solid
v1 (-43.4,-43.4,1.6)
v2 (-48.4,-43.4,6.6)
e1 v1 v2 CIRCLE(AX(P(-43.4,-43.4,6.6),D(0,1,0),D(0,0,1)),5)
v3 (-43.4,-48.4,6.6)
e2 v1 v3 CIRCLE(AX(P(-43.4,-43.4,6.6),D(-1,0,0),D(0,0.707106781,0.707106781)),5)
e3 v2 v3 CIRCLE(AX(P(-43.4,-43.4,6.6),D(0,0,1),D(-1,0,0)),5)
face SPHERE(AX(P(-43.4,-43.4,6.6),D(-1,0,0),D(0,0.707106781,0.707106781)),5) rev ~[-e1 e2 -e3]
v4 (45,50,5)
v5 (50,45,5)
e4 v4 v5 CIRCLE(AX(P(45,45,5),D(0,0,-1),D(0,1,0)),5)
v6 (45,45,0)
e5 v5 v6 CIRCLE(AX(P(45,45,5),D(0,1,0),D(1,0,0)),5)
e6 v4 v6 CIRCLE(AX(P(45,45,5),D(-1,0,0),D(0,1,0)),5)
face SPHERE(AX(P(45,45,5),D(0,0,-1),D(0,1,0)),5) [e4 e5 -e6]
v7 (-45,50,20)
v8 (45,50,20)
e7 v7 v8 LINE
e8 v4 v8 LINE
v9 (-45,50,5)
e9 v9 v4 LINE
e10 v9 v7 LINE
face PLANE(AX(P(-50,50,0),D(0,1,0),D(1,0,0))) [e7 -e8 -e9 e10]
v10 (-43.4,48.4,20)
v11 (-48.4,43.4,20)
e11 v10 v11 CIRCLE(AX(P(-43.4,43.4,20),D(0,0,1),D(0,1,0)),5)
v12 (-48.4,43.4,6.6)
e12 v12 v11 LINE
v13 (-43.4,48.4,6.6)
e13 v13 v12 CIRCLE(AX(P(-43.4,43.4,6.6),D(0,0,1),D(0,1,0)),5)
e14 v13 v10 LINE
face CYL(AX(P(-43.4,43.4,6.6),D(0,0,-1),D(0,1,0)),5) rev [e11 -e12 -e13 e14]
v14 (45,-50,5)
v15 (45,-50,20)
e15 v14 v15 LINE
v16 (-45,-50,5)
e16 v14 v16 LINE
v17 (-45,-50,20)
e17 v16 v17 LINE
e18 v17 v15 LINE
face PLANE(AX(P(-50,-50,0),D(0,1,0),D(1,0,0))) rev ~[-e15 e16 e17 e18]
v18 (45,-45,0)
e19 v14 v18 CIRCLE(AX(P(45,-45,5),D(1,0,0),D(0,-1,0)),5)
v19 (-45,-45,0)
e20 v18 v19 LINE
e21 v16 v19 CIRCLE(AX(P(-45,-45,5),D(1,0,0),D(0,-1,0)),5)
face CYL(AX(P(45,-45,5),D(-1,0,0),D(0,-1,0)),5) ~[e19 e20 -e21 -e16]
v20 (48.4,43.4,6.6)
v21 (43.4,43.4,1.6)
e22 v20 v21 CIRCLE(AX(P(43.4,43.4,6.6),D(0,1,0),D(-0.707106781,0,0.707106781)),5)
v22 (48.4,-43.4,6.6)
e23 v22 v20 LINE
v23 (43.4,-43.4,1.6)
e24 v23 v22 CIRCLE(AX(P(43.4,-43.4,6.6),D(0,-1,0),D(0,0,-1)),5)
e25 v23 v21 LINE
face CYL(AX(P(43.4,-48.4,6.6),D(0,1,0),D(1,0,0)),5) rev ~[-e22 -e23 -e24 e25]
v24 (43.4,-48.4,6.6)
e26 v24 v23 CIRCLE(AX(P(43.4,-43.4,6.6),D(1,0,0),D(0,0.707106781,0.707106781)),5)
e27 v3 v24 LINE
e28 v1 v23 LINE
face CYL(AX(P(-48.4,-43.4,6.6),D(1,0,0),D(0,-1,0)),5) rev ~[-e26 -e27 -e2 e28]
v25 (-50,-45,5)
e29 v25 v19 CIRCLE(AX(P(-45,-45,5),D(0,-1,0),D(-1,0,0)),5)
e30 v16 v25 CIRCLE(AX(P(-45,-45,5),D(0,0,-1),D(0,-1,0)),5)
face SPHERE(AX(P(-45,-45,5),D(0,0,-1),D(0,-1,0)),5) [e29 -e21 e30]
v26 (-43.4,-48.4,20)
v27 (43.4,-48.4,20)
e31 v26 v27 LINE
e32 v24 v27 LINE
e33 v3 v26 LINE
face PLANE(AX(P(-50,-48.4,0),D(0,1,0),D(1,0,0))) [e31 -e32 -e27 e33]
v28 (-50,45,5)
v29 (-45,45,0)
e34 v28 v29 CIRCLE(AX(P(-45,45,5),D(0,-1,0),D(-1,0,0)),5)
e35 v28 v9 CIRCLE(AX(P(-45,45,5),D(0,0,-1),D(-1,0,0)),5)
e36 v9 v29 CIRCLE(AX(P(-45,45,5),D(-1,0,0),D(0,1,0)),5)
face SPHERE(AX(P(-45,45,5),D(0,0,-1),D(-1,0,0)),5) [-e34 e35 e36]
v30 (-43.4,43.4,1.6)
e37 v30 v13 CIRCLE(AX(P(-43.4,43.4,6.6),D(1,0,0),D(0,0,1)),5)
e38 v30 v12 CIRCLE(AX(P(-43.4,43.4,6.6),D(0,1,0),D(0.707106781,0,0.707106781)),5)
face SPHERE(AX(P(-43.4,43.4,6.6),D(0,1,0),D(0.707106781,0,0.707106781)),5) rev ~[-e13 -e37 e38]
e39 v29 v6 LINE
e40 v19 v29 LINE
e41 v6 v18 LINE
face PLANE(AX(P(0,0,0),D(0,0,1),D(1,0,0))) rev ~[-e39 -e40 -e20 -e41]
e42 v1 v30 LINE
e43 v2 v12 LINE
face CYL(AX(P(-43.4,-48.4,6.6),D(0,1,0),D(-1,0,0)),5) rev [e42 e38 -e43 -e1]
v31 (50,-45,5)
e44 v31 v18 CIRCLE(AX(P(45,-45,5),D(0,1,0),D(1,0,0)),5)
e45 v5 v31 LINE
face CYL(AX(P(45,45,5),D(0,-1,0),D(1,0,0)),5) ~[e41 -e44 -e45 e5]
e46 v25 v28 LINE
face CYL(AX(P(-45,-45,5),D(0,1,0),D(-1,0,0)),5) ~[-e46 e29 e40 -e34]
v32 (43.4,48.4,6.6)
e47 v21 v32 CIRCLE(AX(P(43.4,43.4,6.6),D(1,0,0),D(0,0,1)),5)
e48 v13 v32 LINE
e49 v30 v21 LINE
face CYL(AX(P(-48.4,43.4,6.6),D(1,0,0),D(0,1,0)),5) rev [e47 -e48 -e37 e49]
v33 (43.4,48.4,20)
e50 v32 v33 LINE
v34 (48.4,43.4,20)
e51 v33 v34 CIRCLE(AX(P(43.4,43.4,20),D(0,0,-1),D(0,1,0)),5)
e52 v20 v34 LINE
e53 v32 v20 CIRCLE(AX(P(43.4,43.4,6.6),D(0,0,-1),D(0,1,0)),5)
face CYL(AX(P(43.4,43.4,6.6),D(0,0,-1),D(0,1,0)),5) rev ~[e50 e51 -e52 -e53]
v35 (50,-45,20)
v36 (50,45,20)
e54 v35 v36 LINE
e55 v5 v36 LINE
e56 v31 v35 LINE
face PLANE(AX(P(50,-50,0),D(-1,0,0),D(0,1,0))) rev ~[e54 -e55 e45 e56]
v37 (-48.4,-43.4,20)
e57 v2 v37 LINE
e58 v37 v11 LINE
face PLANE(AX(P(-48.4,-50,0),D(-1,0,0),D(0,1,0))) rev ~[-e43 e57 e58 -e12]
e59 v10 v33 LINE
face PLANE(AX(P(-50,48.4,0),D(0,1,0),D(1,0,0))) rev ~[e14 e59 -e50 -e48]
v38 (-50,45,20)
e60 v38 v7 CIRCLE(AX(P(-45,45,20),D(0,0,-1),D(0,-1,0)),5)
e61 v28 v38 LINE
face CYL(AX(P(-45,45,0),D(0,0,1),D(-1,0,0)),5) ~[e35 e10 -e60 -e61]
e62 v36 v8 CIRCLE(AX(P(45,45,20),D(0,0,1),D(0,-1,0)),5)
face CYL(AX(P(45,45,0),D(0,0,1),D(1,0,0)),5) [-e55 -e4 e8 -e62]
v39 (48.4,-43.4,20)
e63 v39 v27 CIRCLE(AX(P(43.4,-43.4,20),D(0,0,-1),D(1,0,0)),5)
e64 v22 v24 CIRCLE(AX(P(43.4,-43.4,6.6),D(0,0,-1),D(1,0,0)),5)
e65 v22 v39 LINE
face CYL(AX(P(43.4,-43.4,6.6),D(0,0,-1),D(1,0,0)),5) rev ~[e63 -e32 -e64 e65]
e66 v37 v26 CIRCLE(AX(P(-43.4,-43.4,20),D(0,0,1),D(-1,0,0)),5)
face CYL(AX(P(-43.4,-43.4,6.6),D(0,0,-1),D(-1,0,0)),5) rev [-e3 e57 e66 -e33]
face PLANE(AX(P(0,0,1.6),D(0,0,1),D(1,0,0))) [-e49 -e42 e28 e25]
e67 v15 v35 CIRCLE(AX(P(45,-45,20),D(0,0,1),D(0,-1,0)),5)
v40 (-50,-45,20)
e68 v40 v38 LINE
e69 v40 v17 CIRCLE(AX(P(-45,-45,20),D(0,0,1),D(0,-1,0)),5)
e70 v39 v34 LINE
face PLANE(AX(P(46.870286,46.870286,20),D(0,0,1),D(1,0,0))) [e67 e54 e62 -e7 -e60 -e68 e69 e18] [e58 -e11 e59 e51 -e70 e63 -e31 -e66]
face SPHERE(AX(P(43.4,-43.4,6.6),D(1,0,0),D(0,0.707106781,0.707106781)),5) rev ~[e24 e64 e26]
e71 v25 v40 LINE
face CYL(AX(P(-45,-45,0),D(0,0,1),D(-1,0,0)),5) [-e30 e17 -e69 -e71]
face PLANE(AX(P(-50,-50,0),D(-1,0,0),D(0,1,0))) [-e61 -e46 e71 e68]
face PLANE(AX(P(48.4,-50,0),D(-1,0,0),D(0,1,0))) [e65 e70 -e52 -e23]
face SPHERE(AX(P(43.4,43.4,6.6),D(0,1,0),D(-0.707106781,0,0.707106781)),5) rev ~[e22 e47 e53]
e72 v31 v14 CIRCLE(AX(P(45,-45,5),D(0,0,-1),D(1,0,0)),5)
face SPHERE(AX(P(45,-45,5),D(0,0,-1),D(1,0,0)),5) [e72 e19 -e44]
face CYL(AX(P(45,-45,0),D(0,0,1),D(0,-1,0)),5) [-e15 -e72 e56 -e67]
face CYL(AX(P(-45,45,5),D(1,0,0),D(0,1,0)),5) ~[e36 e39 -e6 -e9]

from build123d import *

# Parameters (mm, degrees)
F0_W         = 100
F0_H         = 100
F1_DEPTH     = 20
F2_T         = -1.6
F3_R         = 5
F4_T1_DEPTH  = 13.4
F4_S5_W      = 5
F4_S5_H      = 5
F4_T6_DEPTH  = 5
F4_S11_W     = 5
F4_S11_H     = 5
F4_T12_DEPTH = 5
F4_S17_W     = 5
F4_S17_H     = 5
F4_T18_DEPTH = 5
F4_S23_W     = 5
F4_S23_H     = 5
F4_T24_DEPTH = 5
F5_R         = 5
F6_R         = 5


# Not quite as in the source:
# - a fillet or chamfer that OpenCascade refuses, or shapes differently, is made with other operations: its cross-section is extruded or revolved along the edge and cut away or added


with BuildPart() as f1:
    # F0 (on Top) → F1 (new body)
    with BuildSketch(Plane.XY):
        Rectangle(F0_W, F0_H)
    extrude(amount=F1_DEPTH)

    # F2
    f2_openings = [f1.faces().sort_by_distance(p)[0] for p in [
        (0, 0, 20),
    ]]
    offset(amount=F2_T, openings=f2_openings)

    # F3
    f3_edges = [f1.edges().sort_by_distance(p)[0] for p in [
        (-48.4, 0, 1.6),
        (0, 48.4, 1.6),
        (48.4, 0, 1.6),
        (0, -48.4, 1.6),
    ]]
    fillet(f3_edges, radius=F3_R)

    # F4: fillet of radius 5 on 8 edges, made by hand

    # F4_s2 → F4_t1 (join)
    with BuildSketch(Plane.XY.offset(6.6)):
        with BuildLine():
            ThreePointArc((43.4, 48.4), (46.9355339059, 46.9355339059), (48.4, 43.4))
            Line((48.4, 43.4), (48.4, 48.4))
            Line((48.4, 48.4), (43.4, 48.4))
        make_face()
        with BuildLine():
            ThreePointArc((48.4, -43.4), (46.9355339059, -46.9355339059), (43.4, -48.4))
            Line((43.4, -48.4), (48.4, -48.4))
            Line((48.4, -48.4), (48.4, -43.4))
        make_face()
        with BuildLine():
            ThreePointArc((-48.4, -43.4), (-46.9355339059, -46.9355339059), (-43.4, -48.4))
            Line((-43.4, -48.4), (-48.4, -48.4))
            Line((-48.4, -48.4), (-48.4, -43.4))
        make_face()
        with BuildLine():
            ThreePointArc((-43.4, 48.4), (-46.9355339059, 46.9355339059), (-48.4, 43.4))
            Line((-48.4, 43.4), (-48.4, 48.4))
            Line((-48.4, 48.4), (-43.4, 48.4))
        make_face()
    extrude(amount=F4_T1_DEPTH)


with BuildPart() as f4_tool4:
    # F4_s5 → F4_t6 (new body)
    with BuildSketch(Plane.XZ.offset(-43.4)):
        with Locations((45.9, 4.1)):
            Rectangle(F4_S5_W, F4_S5_H)
    extrude(amount=-F4_T6_DEPTH)

    # F4_s7 → F4_t8 (revolve, cut)
    with BuildSketch(Plane(origin=(43.4, 43.4, 6.6), x_dir=(-0.7071067812, 0, 0.7071067812), z_dir=(-0.7071067812, 0, -0.7071067812))):
        with BuildLine():
            ThreePointArc((0, -5), (5, 0), (0, 5))
            Line((0, 5), (0, -5))
        make_face()
    revolve(axis=Axis((43.4, 43.4, 6.6), (0, 1, 0)), mode=Mode.SUBTRACT)


with BuildPart() as f1_1:
    add(f1.part)

    # F4_t3: union F4_tool4
    add(f4_tool4.part)


with BuildPart() as f4_tool10:
    # F4_s11 → F4_t12 (new body)
    with BuildSketch(Plane.YZ.offset(43.4)):
        with Locations((-45.9, 4.1)):
            Rectangle(F4_S11_W, F4_S11_H)
    extrude(amount=F4_T12_DEPTH)

    # F4_s13 → F4_t14 (revolve, cut)
    with BuildSketch(Plane(origin=(43.4, -43.4, 6.6), x_dir=(0, 0.7071067812, 0.7071067812), z_dir=(0, 0.7071067812, -0.7071067812))):
        with BuildLine():
            ThreePointArc((0, -5), (5, 0), (0, 5))
            Line((0, 5), (0, -5))
        make_face()
    revolve(axis=Axis((43.4, -43.4, 6.6), (1, 0, 0)), mode=Mode.SUBTRACT)


with BuildPart() as f1_2:
    add(f1_1.part)

    # F4_t9: union F4_tool10
    add(f4_tool10.part)


with BuildPart() as f4_tool16:
    # F4_s17 → F4_t18 (new body)
    with BuildSketch(Plane.YZ.offset(-43.4)):
        with Locations((-45.9, 4.1)):
            Rectangle(F4_S17_W, F4_S17_H)
    extrude(amount=-F4_T18_DEPTH)

    # F4_s19 → F4_t20 (revolve, cut)
    with BuildSketch(Plane(origin=(-43.4, -43.4, 6.6), x_dir=(0, 0.7071067812, 0.7071067812), z_dir=(0, -0.7071067812, 0.7071067812))):
        with BuildLine():
            ThreePointArc((0, -5), (5, 0), (0, 5))
            Line((0, 5), (0, -5))
        make_face()
    revolve(axis=Axis((-43.4, -43.4, 6.6), (-1, 0, 0)), mode=Mode.SUBTRACT)


with BuildPart() as f1_3:
    add(f1_2.part)

    # F4_t15: union F4_tool16
    add(f4_tool16.part)


with BuildPart() as f4_tool22:
    # F4_s23 → F4_t24 (new body)
    with BuildSketch(Plane.XZ.offset(-43.4)):
        with Locations((-45.9, 4.1)):
            Rectangle(F4_S23_W, F4_S23_H)
    extrude(amount=-F4_T24_DEPTH)

    # F4_s25 → F4_t26 (revolve, cut)
    with BuildSketch(Plane(origin=(-43.4, 43.4, 6.6), x_dir=(0.7071067812, 0, 0.7071067812), z_dir=(-0.7071067812, 0, 0.7071067812))):
        with BuildLine():
            ThreePointArc((0, -5), (5, 0), (0, 5))
            Line((0, 5), (0, -5))
        make_face()
    revolve(axis=Axis((-43.4, 43.4, 6.6), (0, 1, 0)), mode=Mode.SUBTRACT)


with BuildPart() as f1_4:
    add(f1_3.part)

    # F4_t21: union F4_tool22
    add(f4_tool22.part)

    # F5
    f5_edges = [f1_4.edges().sort_by_distance(p)[0] for p in [
        (50, -50, 10),
        (-50, -50, 10),
        (-50, 50, 10),
        (50, 50, 10),
    ]]
    fillet(f5_edges, radius=F5_R)

    # F6
    f6_edges = [f1_4.edges().sort_by_distance(p)[0] for p in [
        (-50, 0, 0),
        (0, 50, 0),
        (-48.535534, 48.535534, 0),
        (48.535534, 48.535534, 0),
        (50, 0, 0),
        (48.535534, -48.535534, 0),
        (0, -50, 0),
        (-48.535534, -48.535534, 0),
    ]]
    fillet(f6_edges, radius=F6_R)


solid = f1_4.part
